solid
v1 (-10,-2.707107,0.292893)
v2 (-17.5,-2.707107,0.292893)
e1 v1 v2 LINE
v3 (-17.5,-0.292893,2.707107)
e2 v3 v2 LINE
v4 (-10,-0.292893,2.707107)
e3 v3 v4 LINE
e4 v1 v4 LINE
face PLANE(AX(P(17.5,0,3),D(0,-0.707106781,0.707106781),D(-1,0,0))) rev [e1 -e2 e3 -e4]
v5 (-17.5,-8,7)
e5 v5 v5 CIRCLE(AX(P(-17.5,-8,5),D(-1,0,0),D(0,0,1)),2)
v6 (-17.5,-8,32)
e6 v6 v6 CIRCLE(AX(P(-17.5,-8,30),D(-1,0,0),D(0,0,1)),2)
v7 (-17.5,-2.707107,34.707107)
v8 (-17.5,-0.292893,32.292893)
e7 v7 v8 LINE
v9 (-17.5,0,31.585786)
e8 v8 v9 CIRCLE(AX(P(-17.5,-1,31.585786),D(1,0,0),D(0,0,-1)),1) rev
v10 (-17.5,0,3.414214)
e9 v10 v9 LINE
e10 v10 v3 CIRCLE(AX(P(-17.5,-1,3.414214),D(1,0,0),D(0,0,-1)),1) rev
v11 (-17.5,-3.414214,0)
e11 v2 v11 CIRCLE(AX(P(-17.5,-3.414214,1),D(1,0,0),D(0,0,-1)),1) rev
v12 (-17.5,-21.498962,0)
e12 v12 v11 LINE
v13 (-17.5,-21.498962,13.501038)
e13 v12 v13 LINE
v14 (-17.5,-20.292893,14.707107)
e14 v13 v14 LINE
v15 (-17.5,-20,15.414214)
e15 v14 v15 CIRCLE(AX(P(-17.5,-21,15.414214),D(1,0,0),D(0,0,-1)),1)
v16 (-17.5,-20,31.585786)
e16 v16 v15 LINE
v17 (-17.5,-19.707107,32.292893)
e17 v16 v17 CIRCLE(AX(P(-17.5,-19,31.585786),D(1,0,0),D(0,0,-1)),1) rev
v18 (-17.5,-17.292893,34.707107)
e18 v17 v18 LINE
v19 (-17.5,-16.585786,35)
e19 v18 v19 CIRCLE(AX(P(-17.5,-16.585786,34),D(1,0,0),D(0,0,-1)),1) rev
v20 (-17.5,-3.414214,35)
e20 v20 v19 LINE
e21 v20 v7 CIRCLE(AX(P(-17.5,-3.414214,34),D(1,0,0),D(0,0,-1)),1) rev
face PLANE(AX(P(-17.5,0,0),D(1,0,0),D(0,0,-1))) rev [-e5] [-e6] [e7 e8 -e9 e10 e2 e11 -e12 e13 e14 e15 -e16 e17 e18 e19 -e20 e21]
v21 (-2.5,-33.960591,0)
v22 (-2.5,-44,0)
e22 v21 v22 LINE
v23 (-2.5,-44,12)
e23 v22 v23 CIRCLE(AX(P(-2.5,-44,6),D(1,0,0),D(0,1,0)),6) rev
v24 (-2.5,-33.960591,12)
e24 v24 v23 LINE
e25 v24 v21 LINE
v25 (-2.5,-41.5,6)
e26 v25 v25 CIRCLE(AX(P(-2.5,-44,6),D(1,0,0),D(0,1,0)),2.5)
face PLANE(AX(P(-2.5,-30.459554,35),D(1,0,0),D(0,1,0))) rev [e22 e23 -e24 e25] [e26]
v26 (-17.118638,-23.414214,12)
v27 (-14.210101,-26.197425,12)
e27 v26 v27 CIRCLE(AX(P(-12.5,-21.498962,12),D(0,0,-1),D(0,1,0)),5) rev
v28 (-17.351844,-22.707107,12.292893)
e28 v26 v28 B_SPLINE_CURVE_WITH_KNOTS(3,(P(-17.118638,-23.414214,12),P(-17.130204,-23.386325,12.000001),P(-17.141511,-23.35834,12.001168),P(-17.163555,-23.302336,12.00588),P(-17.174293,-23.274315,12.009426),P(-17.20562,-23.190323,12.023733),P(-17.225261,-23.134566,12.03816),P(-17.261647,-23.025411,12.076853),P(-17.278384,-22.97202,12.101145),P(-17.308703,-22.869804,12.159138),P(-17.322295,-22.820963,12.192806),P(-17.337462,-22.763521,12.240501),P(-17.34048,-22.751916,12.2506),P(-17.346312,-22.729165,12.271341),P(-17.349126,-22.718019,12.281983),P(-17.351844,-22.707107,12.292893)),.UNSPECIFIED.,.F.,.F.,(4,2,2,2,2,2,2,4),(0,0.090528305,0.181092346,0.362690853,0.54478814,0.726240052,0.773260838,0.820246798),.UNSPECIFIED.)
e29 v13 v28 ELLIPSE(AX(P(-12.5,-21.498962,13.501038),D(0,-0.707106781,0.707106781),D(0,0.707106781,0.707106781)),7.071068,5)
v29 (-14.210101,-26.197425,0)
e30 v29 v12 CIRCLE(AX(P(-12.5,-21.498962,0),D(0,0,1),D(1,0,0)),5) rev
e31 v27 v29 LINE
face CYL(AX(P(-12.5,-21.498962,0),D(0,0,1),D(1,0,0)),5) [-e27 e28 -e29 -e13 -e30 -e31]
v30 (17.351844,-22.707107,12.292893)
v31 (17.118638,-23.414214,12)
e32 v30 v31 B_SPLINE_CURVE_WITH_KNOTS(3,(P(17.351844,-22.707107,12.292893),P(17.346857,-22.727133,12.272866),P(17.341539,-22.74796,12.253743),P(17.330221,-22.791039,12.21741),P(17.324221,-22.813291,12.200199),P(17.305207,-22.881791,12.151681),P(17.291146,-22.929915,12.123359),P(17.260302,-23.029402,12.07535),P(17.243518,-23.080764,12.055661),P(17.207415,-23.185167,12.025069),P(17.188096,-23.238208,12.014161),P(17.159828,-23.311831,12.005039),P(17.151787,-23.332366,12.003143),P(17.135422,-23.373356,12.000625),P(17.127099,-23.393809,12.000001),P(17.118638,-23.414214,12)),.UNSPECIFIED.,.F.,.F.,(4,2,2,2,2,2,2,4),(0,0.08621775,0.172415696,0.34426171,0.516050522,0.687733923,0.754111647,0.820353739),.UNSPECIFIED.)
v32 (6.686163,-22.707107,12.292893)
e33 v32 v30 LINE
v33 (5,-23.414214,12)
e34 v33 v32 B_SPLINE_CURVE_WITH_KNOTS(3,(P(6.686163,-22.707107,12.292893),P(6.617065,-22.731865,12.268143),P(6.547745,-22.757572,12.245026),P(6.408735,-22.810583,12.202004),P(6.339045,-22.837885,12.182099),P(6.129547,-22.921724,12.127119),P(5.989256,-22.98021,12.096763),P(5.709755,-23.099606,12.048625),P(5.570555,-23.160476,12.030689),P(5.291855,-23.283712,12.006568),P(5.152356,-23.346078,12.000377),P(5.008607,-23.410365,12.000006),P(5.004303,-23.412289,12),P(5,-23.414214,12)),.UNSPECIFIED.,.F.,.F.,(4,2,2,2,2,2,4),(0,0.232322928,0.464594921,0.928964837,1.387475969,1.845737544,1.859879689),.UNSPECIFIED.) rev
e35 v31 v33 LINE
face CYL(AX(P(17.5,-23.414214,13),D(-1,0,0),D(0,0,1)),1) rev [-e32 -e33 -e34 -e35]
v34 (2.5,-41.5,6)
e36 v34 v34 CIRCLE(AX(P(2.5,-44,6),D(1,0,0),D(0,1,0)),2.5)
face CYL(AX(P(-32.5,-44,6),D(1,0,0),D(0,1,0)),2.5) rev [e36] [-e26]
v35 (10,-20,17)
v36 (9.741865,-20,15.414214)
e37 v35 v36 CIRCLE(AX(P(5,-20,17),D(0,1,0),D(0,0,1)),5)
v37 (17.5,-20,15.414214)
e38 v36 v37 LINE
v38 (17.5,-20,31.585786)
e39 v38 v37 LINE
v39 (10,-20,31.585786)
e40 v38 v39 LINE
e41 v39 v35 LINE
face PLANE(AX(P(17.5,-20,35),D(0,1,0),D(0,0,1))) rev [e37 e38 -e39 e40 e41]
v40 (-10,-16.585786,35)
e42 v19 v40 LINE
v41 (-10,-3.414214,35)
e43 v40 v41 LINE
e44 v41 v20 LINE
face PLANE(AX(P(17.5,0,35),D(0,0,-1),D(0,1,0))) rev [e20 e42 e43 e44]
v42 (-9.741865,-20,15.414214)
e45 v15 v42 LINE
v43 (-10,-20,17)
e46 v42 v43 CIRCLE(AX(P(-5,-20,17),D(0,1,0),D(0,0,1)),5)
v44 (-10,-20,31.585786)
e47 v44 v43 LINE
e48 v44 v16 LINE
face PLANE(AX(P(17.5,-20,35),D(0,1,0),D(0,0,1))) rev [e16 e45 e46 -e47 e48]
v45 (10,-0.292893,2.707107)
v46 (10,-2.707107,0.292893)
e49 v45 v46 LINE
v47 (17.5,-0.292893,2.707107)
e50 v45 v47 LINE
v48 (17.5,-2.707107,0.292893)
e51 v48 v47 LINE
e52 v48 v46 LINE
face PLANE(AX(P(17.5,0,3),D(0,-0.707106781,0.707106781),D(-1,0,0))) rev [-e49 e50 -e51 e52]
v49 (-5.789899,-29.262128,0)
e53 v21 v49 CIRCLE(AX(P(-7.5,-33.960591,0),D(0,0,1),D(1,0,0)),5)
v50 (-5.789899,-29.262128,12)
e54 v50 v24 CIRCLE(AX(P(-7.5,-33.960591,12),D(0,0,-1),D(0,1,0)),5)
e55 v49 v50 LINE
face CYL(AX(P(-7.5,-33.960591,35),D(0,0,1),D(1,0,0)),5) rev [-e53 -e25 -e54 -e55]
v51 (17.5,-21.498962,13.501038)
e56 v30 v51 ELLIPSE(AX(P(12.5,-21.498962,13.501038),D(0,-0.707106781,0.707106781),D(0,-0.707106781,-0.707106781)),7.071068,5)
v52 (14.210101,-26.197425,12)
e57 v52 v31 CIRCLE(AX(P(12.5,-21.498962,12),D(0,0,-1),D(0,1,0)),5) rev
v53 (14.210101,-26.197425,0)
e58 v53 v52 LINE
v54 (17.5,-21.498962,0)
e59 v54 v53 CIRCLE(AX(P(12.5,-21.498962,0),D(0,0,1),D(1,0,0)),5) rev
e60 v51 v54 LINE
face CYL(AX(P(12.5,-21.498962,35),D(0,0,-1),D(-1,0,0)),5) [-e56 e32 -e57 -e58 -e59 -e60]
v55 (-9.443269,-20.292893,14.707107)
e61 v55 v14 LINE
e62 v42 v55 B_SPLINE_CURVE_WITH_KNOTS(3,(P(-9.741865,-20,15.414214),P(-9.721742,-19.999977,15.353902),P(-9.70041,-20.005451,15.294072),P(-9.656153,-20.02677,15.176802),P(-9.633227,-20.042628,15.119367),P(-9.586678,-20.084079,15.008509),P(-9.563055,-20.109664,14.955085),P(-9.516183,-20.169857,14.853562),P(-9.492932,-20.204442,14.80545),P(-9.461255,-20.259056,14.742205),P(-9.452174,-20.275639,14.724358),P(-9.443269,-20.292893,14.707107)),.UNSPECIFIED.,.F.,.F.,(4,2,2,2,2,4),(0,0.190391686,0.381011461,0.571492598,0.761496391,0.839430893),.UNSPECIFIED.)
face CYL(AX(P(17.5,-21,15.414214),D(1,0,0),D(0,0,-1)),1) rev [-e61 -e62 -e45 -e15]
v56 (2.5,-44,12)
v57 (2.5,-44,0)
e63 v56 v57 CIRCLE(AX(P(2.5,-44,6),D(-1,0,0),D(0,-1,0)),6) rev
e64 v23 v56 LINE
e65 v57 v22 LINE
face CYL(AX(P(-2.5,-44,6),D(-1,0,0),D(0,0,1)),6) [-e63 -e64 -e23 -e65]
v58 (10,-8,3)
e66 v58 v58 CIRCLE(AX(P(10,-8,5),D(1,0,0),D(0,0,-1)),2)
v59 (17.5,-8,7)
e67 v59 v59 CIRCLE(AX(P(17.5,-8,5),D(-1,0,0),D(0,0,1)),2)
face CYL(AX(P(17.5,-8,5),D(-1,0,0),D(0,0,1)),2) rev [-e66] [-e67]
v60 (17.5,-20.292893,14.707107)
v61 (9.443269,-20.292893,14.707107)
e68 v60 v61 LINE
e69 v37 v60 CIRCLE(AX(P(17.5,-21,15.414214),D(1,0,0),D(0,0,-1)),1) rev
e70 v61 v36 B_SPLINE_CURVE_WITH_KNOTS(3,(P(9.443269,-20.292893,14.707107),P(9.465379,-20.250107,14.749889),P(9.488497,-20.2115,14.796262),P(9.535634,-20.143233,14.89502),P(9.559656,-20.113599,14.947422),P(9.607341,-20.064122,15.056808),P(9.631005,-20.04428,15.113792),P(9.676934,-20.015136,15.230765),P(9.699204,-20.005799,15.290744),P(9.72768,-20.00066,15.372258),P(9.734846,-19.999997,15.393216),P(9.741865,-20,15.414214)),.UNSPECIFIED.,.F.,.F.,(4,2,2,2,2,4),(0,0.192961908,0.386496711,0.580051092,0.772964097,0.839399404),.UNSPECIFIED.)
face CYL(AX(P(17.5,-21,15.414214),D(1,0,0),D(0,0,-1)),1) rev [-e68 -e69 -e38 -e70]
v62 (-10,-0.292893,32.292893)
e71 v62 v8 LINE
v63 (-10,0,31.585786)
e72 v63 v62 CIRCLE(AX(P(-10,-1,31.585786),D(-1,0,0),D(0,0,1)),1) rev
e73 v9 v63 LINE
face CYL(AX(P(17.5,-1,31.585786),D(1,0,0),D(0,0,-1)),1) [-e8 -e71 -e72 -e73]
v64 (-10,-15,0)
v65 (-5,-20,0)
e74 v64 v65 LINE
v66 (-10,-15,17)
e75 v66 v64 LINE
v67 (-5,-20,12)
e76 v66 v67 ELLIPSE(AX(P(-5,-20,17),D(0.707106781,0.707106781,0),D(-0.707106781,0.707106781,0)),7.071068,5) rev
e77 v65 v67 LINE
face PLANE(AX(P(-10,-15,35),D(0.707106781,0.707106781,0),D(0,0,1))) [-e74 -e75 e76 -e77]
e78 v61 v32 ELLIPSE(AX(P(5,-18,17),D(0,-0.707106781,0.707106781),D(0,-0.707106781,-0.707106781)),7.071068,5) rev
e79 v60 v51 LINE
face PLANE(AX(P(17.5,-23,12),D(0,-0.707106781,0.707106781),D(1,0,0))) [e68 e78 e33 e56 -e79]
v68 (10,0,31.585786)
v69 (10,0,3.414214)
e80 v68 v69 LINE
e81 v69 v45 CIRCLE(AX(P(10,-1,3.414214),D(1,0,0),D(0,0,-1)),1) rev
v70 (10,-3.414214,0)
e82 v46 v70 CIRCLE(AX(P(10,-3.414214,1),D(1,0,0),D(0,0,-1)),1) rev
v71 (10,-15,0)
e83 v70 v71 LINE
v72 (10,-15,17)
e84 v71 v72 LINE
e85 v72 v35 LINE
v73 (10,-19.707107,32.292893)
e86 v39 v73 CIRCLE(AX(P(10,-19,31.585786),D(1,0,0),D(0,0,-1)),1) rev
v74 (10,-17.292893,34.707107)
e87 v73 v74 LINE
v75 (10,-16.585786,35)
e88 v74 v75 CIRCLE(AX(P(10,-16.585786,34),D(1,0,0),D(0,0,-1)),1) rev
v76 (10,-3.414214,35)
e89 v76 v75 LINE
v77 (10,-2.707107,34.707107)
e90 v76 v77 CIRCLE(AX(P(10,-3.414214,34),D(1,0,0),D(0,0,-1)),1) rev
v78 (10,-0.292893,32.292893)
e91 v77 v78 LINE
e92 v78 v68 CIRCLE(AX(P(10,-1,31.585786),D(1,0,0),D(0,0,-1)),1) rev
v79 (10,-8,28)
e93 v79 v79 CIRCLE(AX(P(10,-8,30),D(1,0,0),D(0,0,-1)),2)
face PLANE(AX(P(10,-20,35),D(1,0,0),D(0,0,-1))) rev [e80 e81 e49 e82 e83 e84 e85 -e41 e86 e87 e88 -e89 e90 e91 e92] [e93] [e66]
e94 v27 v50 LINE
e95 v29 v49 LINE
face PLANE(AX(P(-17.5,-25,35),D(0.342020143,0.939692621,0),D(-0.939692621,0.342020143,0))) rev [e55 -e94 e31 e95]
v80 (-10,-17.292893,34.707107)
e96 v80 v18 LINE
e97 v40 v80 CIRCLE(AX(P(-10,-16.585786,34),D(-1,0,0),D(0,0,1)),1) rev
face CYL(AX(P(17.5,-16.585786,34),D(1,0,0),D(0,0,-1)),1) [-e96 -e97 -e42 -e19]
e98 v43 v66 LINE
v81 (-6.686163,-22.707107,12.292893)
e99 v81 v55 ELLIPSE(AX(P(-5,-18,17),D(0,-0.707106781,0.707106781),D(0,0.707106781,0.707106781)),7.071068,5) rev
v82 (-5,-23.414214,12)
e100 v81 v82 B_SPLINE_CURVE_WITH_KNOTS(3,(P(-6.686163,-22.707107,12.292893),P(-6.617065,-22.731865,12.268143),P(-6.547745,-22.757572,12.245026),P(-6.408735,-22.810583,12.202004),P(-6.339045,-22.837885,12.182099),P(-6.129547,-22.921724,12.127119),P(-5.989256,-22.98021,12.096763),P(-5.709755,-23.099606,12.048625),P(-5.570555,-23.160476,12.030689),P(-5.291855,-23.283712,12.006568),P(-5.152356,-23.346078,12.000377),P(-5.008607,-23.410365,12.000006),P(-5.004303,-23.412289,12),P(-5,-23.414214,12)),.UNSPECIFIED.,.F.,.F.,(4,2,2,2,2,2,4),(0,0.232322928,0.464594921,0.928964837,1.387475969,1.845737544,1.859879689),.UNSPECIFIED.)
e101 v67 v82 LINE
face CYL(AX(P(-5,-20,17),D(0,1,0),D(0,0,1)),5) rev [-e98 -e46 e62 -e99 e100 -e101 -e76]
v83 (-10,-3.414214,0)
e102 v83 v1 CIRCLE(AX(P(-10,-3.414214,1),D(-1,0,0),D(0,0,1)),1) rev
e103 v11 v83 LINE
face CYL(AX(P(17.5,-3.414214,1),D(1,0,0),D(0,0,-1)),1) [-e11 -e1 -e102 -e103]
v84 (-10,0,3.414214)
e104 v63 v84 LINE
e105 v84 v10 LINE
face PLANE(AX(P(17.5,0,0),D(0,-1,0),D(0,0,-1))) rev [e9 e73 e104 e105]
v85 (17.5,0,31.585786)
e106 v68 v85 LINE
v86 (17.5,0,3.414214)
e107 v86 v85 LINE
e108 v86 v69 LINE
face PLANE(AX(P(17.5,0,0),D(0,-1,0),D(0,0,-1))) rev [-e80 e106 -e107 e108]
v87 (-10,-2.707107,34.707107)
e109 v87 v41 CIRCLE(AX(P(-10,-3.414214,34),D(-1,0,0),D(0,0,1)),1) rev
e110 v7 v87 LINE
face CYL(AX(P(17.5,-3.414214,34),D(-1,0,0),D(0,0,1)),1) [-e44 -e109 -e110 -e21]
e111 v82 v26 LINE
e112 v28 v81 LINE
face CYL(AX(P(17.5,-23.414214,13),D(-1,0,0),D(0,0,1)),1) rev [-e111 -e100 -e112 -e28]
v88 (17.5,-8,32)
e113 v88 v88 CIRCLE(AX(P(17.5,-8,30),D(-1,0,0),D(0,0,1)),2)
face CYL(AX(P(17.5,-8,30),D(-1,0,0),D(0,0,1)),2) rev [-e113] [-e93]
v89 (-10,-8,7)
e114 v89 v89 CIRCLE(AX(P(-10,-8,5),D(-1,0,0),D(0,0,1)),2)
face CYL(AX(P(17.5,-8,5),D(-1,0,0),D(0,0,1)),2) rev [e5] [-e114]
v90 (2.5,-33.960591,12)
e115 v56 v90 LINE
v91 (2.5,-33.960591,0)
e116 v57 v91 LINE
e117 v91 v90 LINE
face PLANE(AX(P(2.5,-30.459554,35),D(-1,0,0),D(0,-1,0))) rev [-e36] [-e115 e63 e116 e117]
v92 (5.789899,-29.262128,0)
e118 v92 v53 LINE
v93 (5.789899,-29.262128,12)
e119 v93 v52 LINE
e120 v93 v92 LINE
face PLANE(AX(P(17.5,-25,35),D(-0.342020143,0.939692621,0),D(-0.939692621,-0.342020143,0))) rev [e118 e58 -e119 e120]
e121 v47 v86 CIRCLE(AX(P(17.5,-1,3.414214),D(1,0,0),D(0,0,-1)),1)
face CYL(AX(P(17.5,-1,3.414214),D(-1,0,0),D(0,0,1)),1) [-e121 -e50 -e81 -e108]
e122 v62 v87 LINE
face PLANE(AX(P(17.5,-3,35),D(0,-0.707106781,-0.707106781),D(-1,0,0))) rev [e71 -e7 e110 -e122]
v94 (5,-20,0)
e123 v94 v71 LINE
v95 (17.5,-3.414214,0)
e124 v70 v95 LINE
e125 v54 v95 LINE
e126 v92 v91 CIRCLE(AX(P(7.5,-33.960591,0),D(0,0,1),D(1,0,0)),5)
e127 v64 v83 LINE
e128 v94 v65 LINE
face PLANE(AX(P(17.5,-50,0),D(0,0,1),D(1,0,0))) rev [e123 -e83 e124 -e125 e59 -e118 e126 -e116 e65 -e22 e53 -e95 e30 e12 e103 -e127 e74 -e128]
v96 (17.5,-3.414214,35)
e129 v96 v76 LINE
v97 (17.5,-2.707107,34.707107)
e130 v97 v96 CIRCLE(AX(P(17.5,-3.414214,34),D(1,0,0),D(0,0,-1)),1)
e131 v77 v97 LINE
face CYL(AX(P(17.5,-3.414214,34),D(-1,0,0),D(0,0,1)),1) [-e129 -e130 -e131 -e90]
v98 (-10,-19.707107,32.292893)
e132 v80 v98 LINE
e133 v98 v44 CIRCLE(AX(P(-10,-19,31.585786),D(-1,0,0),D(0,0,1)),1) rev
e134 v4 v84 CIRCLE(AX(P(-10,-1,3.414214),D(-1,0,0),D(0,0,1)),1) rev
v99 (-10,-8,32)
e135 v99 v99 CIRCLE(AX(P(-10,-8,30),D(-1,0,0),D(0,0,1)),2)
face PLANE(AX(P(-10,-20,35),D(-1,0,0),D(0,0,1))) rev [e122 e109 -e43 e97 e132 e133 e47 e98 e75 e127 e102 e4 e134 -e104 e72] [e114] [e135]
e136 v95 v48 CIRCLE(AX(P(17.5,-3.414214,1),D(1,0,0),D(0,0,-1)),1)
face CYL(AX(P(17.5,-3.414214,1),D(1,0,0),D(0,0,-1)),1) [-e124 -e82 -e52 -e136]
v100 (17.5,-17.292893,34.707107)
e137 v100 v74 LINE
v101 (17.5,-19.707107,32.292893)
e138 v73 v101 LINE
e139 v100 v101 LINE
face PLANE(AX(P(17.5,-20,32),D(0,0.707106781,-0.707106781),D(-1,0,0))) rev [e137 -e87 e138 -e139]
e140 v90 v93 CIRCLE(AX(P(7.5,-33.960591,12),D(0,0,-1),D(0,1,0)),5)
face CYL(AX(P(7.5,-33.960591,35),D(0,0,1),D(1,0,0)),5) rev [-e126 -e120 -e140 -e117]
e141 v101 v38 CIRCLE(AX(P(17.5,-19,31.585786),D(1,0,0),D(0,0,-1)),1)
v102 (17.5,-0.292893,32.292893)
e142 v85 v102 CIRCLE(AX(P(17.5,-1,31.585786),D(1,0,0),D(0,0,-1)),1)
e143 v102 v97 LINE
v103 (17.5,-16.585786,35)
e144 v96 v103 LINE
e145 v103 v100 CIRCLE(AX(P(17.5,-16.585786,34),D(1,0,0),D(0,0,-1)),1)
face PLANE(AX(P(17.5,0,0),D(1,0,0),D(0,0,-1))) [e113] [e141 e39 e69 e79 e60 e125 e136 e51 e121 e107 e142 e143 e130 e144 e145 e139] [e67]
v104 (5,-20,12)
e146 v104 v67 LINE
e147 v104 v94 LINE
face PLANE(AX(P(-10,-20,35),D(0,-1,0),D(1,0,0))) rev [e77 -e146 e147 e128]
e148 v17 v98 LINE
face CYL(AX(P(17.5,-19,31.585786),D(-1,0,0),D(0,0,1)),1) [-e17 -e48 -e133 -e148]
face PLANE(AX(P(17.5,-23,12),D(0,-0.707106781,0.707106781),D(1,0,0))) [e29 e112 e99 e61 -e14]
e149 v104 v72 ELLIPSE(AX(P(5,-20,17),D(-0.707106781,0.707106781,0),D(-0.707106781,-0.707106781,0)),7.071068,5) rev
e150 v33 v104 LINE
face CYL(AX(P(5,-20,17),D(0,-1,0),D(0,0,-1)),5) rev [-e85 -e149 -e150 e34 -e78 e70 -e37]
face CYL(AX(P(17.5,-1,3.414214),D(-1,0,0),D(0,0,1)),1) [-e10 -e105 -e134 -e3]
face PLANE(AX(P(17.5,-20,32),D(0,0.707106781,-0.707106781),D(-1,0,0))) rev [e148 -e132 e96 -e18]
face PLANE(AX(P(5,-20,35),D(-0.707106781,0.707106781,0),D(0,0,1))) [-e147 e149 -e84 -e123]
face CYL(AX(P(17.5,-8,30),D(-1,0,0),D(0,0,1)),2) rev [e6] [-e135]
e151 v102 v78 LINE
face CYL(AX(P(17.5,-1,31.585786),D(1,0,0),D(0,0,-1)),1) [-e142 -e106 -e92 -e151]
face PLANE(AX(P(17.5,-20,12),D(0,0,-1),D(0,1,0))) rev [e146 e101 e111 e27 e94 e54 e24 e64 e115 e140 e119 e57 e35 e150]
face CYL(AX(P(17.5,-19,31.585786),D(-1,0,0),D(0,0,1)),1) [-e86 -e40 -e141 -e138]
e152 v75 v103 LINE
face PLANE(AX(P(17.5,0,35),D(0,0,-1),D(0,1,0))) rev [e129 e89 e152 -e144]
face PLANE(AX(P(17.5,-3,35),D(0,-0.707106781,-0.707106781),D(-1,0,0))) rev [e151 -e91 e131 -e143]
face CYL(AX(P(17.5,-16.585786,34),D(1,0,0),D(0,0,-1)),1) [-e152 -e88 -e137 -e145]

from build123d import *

# Parameters (mm, degrees)
BOSS_EXTRUDE1_DEPTH = 17.5
SKETCH2_W           = 20
SKETCH2_H           = 20
CUT_EXTRUDE1_DEPTH  = 64.492125496
SKETCH3_R           = 2
CUT_EXTRUDE2_DEPTH  = 71.356236397
CHAMFER1_SIZE       = 3
CHAMFER2_SIZE       = 5
FILLET1_RADIUS      = 6
FILLET1_LENGTH      = 5
SKETCH4_R           = 2.5
CUT_EXTRUDE3_DEPTH  = 35
FILLET2_R           = 5
FILLET3_R           = 1


with BuildPart() as part:
    # Sketch1 → Boss-Extrude1 (new, symmetric)
    with BuildSketch(Plane(origin=(0, 0, 0), x_dir=(0, 0, -1), z_dir=(1, 0, 0))):
        Polygon((0, 0), (-35, 0), (-35, -20), (-12, -20), (-12, -50), (0, -50), align=None)
    extrude(amount=BOSS_EXTRUDE1_DEPTH, both=True)

    # Sketch2 → Cut-Extrude1 (cut, through all)
    with BuildSketch(Plane(origin=(0, 0, 0), x_dir=(-1, 0, 0), z_dir=(0, 0, -1))):
        Polygon((17.5, -25), (2.5, -30.459553514), (2.5, -50), (17.5, -50), align=None)
        Polygon((-17.5, -50), (-17.5, -25), (-2.5, -30.459553514), (-2.5, -50), align=None)
        with Locations((0, -10)):
            Rectangle(SKETCH2_W, SKETCH2_H)
    extrude(amount=-CUT_EXTRUDE1_DEPTH, mode=Mode.SUBTRACT)

    # Sketch3 → Cut-Extrude2 (cut, through all)
    with BuildSketch(Plane.ZY.offset(17.5)):
        with Locations((5, -8)):
            Circle(SKETCH3_R)
        with Locations((30, -8)):
            Circle(SKETCH3_R)
    extrude(amount=-CUT_EXTRUDE2_DEPTH, mode=Mode.SUBTRACT)

    # Chamfer1
    chamfer1_edges = [part.edges().sort_by_distance(p)[0] for p in [
        (13.75, -20, 12),
        (13.75, -20, 35),
        (13.75, 0, 35),
        (13.75, 0, 0),
        (-13.75, -20, 12),
        (-13.75, -20, 35),
        (-13.75, 0, 35),
        (-13.75, 0, 0),
    ]]
    chamfer(chamfer1_edges, length=CHAMFER1_SIZE)

    # Chamfer2
    chamfer2_edges = [part.edges().sort_by_distance(p)[0] for p in [
        (-10, -20, 6),
        (10, -20, 6),
    ]]
    chamfer(chamfer2_edges, length=CHAMFER2_SIZE)

    # Fillet1: full round fillet: the end face becomes a half cylinder, R = half its width
    fillet1_face = Plane((0, -50, 6), x_dir=(1, 0, 0), z_dir=(0, -1, 0))  # on the end face: x along it, z out of the body
    fillet1_slab = fillet1_face.offset(-FILLET1_RADIUS / 2) * Box(FILLET1_LENGTH, 2 * FILLET1_RADIUS, FILLET1_RADIUS, mode=Mode.PRIVATE)  # the body's end, R deep
    fillet1_round = Plane((0, -44, 6), x_dir=(0, -1, 0), z_dir=(1, 0, 0)) * Cylinder(FILLET1_RADIUS, FILLET1_LENGTH, mode=Mode.PRIVATE)  # its axis R under the face
    add(fillet1_slab - fillet1_round, mode=Mode.SUBTRACT)

    # Sketch4 → Cut-Extrude3 (cut)
    with BuildSketch(Plane(origin=(2.5, 0, 0), x_dir=(0, 0, -1), z_dir=(1, 0, 0))):
        with Locations(Location((-6, -44, 0), (0, 0, 90))):
            Circle(SKETCH4_R)
    extrude(amount=-CUT_EXTRUDE3_DEPTH, mode=Mode.SUBTRACT)

    # Fillet2
    # the kernel refuses this fillet: 5 mm, written as the material it adds along each edge
    with BuildSketch(Plane(origin=(10, -35.5, 12), x_dir=(-1, 0, 0), z_dir=(0, 1, 0))) as fillet2_piece_1_section:
        with BuildLine():
            CenterArc((FILLET2_R, FILLET2_R), FILLET2_R, 180, 90)
            Line((0, FILLET2_R), (0, 0))
            Line((0, 0), (FILLET2_R, 0))
        make_face()
    fillet2_piece_1 = extrude(amount=33, mode=Mode.PRIVATE)
    fillet2_piece_1 = split(fillet2_piece_1, bisect_by=Plane(origin=(9.996559124, -19.16276417, 15.83723583), z_dir=(0, -0.7071067811865476, 0.7071067811865476)), keep=Keep.TOP, mode=Mode.PRIVATE)
    fillet2_piece_1 = split(fillet2_piece_1, bisect_by=Plane(origin=(9.996559124, -20, 16.11631444), z_dir=(0, 1, 0)), keep=Keep.TOP, mode=Mode.PRIVATE)
    add(fillet2_piece_1)
    with BuildSketch(Plane(origin=(10, -35.5, 12), x_dir=(-1, 0, 0), z_dir=(0, 1, 0))) as fillet2_piece_2_section:
        with BuildLine():
            CenterArc((FILLET2_R, FILLET2_R), FILLET2_R, 180, 90)
            Line((0, FILLET2_R), (0, 0))
            Line((0, 0), (FILLET2_R, 0))
        make_face()
    fillet2_piece_2 = extrude(amount=33, mode=Mode.PRIVATE)
    fillet2_piece_2 = split(fillet2_piece_2, bisect_by=Plane(origin=(8.541566655, -21.793394373, 13.206605627), z_dir=(0, 0.7071067811865476, -0.7071067811865476)), keep=Keep.TOP, mode=Mode.PRIVATE)
    fillet2_piece_2 = split(fillet2_piece_2, bisect_by=Plane(origin=(8.541566655, -20, 12.608807503), z_dir=(0, -1, 0)), keep=Keep.TOP, mode=Mode.PRIVATE)
    add(fillet2_piece_2)
    with BuildSketch(Plane(origin=(10, -35.5, 12), x_dir=(-1, 0, 0), z_dir=(0, 1, 0))) as fillet2_piece_3_section:
        with BuildLine():
            CenterArc((FILLET2_R, FILLET2_R), FILLET2_R, 180, 90)
            Line((0, FILLET2_R), (0, 0))
            Line((0, 0), (FILLET2_R, 0))
        make_face()
    fillet2_piece_3 = extrude(amount=33, mode=Mode.PRIVATE)
    fillet2_piece_3 = split(fillet2_piece_3, bisect_by=Plane(origin=(8.131124987, -16.868875013, 13.270711332), z_dir=(0.7071067811865476, -0.7071067811865476, 0)), keep=Keep.TOP, mode=Mode.PRIVATE)
    fillet2_piece_3 = split(fillet2_piece_3, bisect_by=Plane(origin=(9.156989341, -19.812014017, 15.187985983), z_dir=(0, 0.7071067811865476, -0.7071067811865476)), keep=Keep.TOP, mode=Mode.PRIVATE)
    fillet2_piece_3 = split(fillet2_piece_3, bisect_by=Plane(origin=(9.156989341, -20, 13.270711332), z_dir=(0, 1, 0)), keep=Keep.TOP, mode=Mode.PRIVATE)
    add(fillet2_piece_3)
    with BuildSketch(Plane(origin=(-10, -35.5, 12), x_dir=(0, 0, 1), z_dir=(0, 1, 0))) as fillet2_piece_4_section:
        with BuildLine():
            CenterArc((FILLET2_R, FILLET2_R), FILLET2_R, 180, 90)
            Line((0, FILLET2_R), (0, 0))
            Line((0, 0), (FILLET2_R, 0))
        make_face()
    fillet2_piece_4 = extrude(amount=33, mode=Mode.PRIVATE)
    fillet2_piece_4 = split(fillet2_piece_4, bisect_by=Plane(origin=(-8.541566654, -21.793394373, 13.206605627), z_dir=(0, 0.7071067811865476, -0.7071067811865476)), keep=Keep.TOP, mode=Mode.PRIVATE)
    fillet2_piece_4 = split(fillet2_piece_4, bisect_by=Plane(origin=(-8.541566654, -20, 12.608807503), z_dir=(0, -1, 0)), keep=Keep.TOP, mode=Mode.PRIVATE)
    add(fillet2_piece_4)
    with BuildSketch(Plane(origin=(-10, -35.5, 12), x_dir=(0, 0, 1), z_dir=(0, 1, 0))) as fillet2_piece_5_section:
        with BuildLine():
            CenterArc((FILLET2_R, FILLET2_R), FILLET2_R, 180, 90)
            Line((0, FILLET2_R), (0, 0))
            Line((0, 0), (FILLET2_R, 0))
        make_face()
    fillet2_piece_5 = extrude(amount=33, mode=Mode.PRIVATE)
    fillet2_piece_5 = split(fillet2_piece_5, bisect_by=Plane(origin=(-9.996559123, -19.16276417, 15.83723583), z_dir=(0, -0.7071067811865476, 0.7071067811865476)), keep=Keep.TOP, mode=Mode.PRIVATE)
    fillet2_piece_5 = split(fillet2_piece_5, bisect_by=Plane(origin=(-9.996559123, -20, 16.11631444), z_dir=(0, 1, 0)), keep=Keep.TOP, mode=Mode.PRIVATE)
    add(fillet2_piece_5)
    with BuildSketch(Plane(origin=(-10, -35.5, 12), x_dir=(0, 0, 1), z_dir=(0, 1, 0))) as fillet2_piece_6_section:
        with BuildLine():
            CenterArc((FILLET2_R, FILLET2_R), FILLET2_R, 180, 90)
            Line((0, FILLET2_R), (0, 0))
            Line((0, 0), (FILLET2_R, 0))
        make_face()
    fillet2_piece_6 = extrude(amount=33, mode=Mode.PRIVATE)
    fillet2_piece_6 = split(fillet2_piece_6, bisect_by=Plane(origin=(-9.156989342, -19.812014017, 15.187985983), z_dir=(0, 0.7071067811865476, -0.7071067811865476)), keep=Keep.TOP, mode=Mode.PRIVATE)
    fillet2_piece_6 = split(fillet2_piece_6, bisect_by=Plane(origin=(-8.131124988, -16.868875012, 13.270711332), z_dir=(-0.7071067811865476, -0.7071067811865476, 0)), keep=Keep.TOP, mode=Mode.PRIVATE)
    fillet2_piece_6 = split(fillet2_piece_6, bisect_by=Plane(origin=(-9.156989342, -20, 13.270711332), z_dir=(0, 1, 0)), keep=Keep.TOP, mode=Mode.PRIVATE)
    add(fillet2_piece_6)
    with BuildSketch(Plane(origin=(2.5, -30.459553514, 0), x_dir=(0, -1, 0), z_dir=(0, 0, 1)), Plane(origin=(-2.5, -30.459553514, 0), x_dir=(-0.9396926207859091, 0.34202014332566677, 0), z_dir=(0, 0, 1))) as fillet2_piece_7:
        with BuildLine():
            CenterArc((FILLET2_R * 0.70020753821, FILLET2_R), FILLET2_R, 200, 70)
            Line((-FILLET2_R * 0.239485082576, FILLET2_R * 0.657979856674), (0, 0))
            Line((0, 0), (FILLET2_R * 0.70020753821, 0))
        make_face()
    extrude(amount=12)
    # the kernel refuses this fillet: 5 mm, written as the material it takes off along each edge
    with BuildSketch(Plane(origin=(17.5, -25, -8.752594228), x_dir=(0, 1, 0), z_dir=(0, 0, 1))) as fillet2_2_piece_1:
        with BuildLine():
            CenterArc((FILLET2_R * 0.70020753821, FILLET2_R), FILLET2_R, 200, 70)
            Line((-FILLET2_R * 0.239485082576, FILLET2_R * 0.657979856674), (0, 0))
            Line((0, 0), (FILLET2_R * 0.70020753821, 0))
        make_face()
    extrude(amount=29.505188455, mode=Mode.SUBTRACT)
    with BuildSketch(Plane(origin=(-17.5, -25, -8.752594228), x_dir=(0, 1, 0), z_dir=(0, 0, 1))) as fillet2_2_piece_2:
        with BuildLine():
            CenterArc((FILLET2_R * 0.70020753821, -FILLET2_R), FILLET2_R, 90, 70)
            Line((-FILLET2_R * 0.239485082576, -FILLET2_R * 0.657979856674), (0, 0))
            Line((0, 0), (FILLET2_R * 0.70020753821, 0))
        make_face()
    extrude(amount=29.505188455, mode=Mode.SUBTRACT)

    # Fillet3
    fillet3_edges = [part.edges().sort_by_distance(p)[0] for p in [
        (11.134684772, -23, 12),
        (13.541287847, -20, 15),
        (13.75, -20, 32),
        (13.75, -17, 35),
        (13.75, 0, 32),
        (13.75, 0, 3),
        (13.75, -3, 0),
        (13.75, -3, 35),
        (-13.75, -20, 32),
        (-13.541287847, -20, 15),
        (-11.134684772, -23, 12),
        (-13.75, -3, 0),
        (-13.75, 0, 3),
        (-13.75, 0, 32),
        (-13.75, -3, 35),
        (-13.75, -17, 35),
    ]]
    fillet(fillet3_edges, radius=FILLET3_R)


solid = part.part
